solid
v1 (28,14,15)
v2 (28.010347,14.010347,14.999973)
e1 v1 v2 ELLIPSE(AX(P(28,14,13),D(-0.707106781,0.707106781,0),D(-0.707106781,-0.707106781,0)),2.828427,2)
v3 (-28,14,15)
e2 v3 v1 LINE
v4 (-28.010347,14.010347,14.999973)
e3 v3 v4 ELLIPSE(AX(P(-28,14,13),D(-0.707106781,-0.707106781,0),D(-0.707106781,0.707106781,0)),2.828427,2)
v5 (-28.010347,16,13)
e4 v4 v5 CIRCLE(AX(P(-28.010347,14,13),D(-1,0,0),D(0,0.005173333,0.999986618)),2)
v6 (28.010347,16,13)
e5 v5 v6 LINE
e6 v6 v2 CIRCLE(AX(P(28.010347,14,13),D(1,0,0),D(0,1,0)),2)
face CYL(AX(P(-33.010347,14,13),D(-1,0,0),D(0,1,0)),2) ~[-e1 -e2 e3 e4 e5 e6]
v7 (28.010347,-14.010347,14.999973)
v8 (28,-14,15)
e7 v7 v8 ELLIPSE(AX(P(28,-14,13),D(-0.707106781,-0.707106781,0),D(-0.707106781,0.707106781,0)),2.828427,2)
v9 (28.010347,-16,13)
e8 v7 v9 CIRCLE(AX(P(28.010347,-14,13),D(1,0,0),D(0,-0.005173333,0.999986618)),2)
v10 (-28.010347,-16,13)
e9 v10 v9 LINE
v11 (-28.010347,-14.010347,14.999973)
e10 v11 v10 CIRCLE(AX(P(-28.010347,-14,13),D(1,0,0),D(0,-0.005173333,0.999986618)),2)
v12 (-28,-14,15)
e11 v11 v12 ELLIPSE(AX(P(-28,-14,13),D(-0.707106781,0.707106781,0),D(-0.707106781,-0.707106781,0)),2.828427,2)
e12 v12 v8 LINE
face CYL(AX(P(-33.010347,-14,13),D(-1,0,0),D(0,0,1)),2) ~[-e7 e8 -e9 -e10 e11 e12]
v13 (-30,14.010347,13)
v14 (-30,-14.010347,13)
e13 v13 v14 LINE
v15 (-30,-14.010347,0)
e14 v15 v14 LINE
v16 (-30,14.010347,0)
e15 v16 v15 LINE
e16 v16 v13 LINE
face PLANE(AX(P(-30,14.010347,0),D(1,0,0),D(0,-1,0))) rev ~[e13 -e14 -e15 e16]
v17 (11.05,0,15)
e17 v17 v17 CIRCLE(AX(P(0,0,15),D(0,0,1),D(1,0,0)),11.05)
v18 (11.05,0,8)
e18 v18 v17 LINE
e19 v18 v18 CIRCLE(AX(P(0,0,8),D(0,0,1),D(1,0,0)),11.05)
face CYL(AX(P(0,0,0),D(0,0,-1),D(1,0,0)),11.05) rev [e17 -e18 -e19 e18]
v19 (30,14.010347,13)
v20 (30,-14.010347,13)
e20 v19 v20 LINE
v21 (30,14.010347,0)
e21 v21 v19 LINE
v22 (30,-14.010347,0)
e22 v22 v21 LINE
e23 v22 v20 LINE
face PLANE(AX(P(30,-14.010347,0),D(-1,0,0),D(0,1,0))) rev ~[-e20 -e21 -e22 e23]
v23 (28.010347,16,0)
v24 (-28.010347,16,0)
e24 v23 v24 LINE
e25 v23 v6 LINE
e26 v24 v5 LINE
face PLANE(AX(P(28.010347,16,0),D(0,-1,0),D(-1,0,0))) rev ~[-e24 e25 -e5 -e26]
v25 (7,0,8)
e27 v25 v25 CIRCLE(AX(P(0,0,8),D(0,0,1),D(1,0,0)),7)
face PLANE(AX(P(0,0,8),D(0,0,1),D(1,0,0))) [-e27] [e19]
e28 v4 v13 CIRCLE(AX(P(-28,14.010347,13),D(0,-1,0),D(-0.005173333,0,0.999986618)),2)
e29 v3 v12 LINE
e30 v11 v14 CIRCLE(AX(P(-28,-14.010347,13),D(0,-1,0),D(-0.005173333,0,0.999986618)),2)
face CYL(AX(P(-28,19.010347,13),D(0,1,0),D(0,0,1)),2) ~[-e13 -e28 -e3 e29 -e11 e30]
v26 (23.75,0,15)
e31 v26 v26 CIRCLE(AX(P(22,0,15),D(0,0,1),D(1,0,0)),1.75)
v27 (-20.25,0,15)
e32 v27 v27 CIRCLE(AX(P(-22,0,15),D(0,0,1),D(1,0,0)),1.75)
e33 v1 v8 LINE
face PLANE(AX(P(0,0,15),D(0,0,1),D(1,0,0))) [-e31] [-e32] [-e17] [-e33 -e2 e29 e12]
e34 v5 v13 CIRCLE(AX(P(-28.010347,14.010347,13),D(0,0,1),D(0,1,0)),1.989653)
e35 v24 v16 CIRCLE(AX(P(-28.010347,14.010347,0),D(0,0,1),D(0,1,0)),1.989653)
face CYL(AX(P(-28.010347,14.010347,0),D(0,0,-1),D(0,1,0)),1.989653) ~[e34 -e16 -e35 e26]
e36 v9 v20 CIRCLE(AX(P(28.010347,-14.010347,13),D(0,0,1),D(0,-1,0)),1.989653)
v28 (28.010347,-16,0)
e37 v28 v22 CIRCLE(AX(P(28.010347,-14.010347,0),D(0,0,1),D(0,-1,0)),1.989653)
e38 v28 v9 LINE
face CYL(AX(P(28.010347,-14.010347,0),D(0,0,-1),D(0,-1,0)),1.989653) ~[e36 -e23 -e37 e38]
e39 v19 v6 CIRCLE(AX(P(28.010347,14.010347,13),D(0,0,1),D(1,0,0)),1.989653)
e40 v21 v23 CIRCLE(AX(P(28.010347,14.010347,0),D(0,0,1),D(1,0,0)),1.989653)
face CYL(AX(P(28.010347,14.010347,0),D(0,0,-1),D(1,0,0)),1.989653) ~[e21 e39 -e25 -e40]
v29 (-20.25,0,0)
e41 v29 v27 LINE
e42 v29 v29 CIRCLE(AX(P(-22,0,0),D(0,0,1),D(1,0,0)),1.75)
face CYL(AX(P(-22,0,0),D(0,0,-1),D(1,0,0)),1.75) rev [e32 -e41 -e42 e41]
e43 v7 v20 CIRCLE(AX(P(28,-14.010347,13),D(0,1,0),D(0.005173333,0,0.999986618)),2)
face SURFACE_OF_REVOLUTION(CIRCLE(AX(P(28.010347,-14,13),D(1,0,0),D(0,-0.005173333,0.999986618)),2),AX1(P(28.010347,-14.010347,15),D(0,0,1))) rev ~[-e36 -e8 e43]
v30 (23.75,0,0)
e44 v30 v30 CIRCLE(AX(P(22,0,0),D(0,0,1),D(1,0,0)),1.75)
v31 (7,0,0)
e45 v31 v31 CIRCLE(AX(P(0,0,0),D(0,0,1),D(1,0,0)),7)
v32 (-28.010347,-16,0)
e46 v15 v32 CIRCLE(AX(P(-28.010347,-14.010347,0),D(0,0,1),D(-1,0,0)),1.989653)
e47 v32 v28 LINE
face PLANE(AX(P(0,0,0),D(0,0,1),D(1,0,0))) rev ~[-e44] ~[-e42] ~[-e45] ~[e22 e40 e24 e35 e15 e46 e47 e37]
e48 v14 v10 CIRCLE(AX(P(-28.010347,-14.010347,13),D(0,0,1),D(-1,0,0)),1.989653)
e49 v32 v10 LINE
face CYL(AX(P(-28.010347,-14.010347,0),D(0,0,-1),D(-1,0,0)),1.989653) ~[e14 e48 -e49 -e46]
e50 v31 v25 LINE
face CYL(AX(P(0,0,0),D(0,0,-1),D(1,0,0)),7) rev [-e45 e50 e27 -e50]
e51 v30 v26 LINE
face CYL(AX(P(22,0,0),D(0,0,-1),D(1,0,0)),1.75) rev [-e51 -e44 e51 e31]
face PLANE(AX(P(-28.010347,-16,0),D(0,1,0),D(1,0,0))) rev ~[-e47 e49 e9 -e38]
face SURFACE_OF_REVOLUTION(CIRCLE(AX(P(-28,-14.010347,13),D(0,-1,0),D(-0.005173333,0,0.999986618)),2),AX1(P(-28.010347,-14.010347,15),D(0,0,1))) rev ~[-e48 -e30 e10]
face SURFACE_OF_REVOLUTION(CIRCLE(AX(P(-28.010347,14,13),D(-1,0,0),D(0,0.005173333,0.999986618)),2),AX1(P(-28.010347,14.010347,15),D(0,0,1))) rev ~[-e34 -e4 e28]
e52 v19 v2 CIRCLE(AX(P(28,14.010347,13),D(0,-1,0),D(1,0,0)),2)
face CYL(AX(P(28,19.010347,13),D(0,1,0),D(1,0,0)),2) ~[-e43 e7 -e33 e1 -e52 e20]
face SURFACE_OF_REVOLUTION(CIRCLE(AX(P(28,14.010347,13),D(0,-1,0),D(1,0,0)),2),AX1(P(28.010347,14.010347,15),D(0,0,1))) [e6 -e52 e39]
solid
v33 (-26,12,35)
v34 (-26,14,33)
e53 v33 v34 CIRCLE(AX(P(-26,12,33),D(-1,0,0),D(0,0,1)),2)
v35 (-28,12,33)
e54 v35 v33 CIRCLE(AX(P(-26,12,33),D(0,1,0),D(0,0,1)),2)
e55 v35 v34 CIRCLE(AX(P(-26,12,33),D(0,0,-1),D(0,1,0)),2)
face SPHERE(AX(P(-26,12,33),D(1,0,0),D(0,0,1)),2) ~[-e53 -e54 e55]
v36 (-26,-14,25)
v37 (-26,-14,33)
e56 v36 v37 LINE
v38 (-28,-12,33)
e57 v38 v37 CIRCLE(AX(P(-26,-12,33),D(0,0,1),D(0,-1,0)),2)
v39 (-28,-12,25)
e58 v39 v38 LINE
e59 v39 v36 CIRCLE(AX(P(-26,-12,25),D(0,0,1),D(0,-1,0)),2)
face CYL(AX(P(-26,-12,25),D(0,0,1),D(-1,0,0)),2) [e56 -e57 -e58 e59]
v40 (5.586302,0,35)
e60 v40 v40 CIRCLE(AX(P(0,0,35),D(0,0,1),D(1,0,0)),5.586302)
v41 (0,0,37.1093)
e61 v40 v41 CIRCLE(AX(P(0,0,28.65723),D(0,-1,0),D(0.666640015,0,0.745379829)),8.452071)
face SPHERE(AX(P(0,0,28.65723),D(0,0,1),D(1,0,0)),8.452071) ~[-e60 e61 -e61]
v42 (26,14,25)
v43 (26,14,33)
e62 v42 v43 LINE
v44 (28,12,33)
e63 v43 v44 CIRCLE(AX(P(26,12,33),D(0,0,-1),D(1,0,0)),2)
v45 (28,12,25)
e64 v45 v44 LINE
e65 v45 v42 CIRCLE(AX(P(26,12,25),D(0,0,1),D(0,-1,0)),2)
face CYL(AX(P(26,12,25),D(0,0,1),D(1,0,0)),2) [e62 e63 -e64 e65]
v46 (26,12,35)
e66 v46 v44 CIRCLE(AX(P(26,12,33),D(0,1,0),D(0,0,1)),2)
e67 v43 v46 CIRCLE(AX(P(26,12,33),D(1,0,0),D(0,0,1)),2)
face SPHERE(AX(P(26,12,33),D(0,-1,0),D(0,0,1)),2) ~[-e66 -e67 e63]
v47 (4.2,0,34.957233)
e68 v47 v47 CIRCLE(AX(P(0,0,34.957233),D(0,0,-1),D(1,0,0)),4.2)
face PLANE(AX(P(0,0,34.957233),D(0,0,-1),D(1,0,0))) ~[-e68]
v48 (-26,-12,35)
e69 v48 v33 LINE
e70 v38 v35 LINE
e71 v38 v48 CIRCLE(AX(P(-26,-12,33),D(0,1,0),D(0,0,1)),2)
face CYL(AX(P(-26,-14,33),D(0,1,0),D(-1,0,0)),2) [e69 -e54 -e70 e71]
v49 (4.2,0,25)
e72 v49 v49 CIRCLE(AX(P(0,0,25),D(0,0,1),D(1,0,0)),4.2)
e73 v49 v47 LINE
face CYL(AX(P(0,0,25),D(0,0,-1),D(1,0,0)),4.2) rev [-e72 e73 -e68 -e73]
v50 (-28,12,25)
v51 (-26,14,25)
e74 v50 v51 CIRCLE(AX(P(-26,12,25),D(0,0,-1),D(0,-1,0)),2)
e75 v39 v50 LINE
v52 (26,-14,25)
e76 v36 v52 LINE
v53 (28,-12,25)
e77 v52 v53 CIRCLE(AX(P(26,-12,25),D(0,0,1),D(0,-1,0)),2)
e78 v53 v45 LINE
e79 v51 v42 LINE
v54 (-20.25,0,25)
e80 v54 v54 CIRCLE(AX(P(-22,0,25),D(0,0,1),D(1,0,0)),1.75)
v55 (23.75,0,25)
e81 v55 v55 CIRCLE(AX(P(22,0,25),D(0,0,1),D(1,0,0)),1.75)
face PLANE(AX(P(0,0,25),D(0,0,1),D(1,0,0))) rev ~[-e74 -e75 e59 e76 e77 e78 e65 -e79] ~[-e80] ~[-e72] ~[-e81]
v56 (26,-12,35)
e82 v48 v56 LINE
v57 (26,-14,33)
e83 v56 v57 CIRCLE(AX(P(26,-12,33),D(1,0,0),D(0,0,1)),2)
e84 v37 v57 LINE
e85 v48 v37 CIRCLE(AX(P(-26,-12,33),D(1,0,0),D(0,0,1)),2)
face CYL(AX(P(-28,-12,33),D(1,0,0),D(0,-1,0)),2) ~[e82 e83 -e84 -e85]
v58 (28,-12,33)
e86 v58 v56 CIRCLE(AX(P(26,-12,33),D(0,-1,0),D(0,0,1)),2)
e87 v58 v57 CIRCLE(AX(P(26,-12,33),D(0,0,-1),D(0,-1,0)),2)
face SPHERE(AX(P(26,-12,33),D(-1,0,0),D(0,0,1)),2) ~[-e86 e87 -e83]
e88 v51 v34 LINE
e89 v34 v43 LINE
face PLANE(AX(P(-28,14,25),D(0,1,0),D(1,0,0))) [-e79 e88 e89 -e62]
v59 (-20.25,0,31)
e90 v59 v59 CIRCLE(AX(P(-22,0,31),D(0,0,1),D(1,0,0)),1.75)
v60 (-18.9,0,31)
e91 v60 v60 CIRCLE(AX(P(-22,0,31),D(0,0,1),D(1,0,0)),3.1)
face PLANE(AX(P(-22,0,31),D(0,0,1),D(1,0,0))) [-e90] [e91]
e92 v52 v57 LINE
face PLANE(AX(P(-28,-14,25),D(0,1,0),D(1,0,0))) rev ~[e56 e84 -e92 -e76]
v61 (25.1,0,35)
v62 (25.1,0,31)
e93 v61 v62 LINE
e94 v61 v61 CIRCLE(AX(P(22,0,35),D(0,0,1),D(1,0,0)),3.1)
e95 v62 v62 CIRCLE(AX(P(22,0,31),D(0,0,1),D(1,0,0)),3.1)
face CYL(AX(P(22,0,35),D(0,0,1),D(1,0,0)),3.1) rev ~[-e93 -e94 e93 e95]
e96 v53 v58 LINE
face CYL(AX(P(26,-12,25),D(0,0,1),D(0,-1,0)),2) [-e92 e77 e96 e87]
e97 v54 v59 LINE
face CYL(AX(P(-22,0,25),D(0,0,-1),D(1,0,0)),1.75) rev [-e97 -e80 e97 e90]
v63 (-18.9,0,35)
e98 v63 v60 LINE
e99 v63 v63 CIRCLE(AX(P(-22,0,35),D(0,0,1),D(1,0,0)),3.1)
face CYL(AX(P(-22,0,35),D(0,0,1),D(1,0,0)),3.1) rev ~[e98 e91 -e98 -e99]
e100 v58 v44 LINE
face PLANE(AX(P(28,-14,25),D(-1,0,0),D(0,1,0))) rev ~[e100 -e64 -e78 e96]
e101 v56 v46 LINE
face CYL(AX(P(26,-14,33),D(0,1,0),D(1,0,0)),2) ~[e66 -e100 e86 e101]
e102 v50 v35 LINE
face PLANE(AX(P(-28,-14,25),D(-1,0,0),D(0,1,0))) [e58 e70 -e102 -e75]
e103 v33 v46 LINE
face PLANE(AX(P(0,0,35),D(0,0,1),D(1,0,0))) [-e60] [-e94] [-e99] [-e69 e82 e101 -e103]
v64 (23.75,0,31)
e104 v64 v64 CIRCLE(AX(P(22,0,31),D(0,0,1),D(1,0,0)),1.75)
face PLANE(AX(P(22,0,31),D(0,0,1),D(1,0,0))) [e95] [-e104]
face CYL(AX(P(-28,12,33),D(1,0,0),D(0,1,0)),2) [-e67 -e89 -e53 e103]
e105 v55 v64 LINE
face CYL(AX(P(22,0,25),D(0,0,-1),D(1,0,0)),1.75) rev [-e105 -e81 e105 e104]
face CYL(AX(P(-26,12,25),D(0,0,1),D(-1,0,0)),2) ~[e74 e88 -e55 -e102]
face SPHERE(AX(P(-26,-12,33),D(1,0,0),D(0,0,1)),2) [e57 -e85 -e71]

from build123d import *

# Parameters (mm, degrees)
F0_R         = 1.75
F0_R_2       = 11.05
F1_DEPTH     = 15
F0_R_3       = 7
F2_DEPTH     = 8
F4_W         = 56
F4_H         = 28
F4_R         = 1.75
F4_R_2       = 4.2
F5_DEPTH     = 10
F6_R         = 2
F7_DEPTH     = 10
F8_T1_DEPTH  = 66.0206933322
F8_T3_DEPTH  = 38.0206933322
F8_T6_ANGLE  = 90
F8_T8_ANGLE  = 90
F8_T10_ANGLE = 90
F8_T12_ANGLE = 90
F9_R         = 3.1
F9_R_2       = 1.75
F10_DEPTH    = 4


# Not quite as in the source:
# - a fillet or chamfer that OpenCascade refuses, or shapes differently, is made with other operations: its cross-section is extruded or revolved along the edge and cut away or added
# - a feature names something its author has since deleted; it is built from what else it names


with BuildPart() as f1:
    # F0 (on Top) → F1 (new body)
    with BuildSketch(Plane.XY):
        with BuildLine():
            Line((28.0103466661, 16), (-28.0103466661, 16))
            ThreePointArc((-28.0103466661, 16), (-29.4172440307, 15.4172440307), (-30, 14.0103466661))
            Line((-30, 14.0103466661), (-30, -14.0103466661))
            ThreePointArc((-30, -14.0103466661), (-29.4172440307, -15.4172440307), (-28.0103466661, -16))
            Line((-28.0103466661, -16), (28.0103466661, -16))
            ThreePointArc((28.0103466661, -16), (29.4172440307, -15.4172440307), (30, -14.0103466661))
            Line((30, -14.0103466661), (30, 14.0103466661))
            ThreePointArc((30, 14.0103466661), (29.4172440307, 15.4172440307), (28.0103466661, 16))
        make_face()
        with Locations((-22, 0)):
            Circle(F0_R, mode=Mode.SUBTRACT)
        Circle(F0_R_2, mode=Mode.SUBTRACT)
        with Locations((22, 0)):
            Circle(F0_R, mode=Mode.SUBTRACT)
    extrude(amount=F1_DEPTH)

    # F0 (on Top) → F2 (join)
    with BuildSketch(Plane.XY):
        Circle(F0_R_2)
        Circle(F0_R_3, mode=Mode.SUBTRACT)
    extrude(amount=F2_DEPTH)

    # F8: fillet of radius 2 on 8 edges, made by hand

    # F8_s2 → F8_t1 (cut)
    with BuildSketch(Plane.YZ.offset(-33.0103466661)):
        with BuildLine():
            ThreePointArc((-14, 15), (-15.4142135624, 14.4142135624), (-16, 13))
            Line((-16, 13), (-16, 15))
            Line((-16, 15), (-14, 15))
        make_face()
        with BuildLine():
            ThreePointArc((16, 13), (15.4142135624, 14.4142135624), (14, 15))
            Line((14, 15), (16, 15))
            Line((16, 15), (16, 13))
        make_face()
    extrude(amount=F8_T1_DEPTH, mode=Mode.SUBTRACT)

    # F8_s4 → F8_t3 (cut)
    with BuildSketch(Plane.XZ.offset(-19.0103466661)):
        with BuildLine():
            ThreePointArc((30, 13), (29.4142135624, 14.4142135624), (28, 15))
            Line((28, 15), (30, 15))
            Line((30, 15), (30, 13))
        make_face()
        with BuildLine():
            ThreePointArc((-28, 15), (-29.4142135624, 14.4142135624), (-30, 13))
            Line((-30, 13), (-30, 15))
            Line((-30, 15), (-28, 15))
        make_face()
    extrude(amount=F8_T3_DEPTH, mode=Mode.SUBTRACT)

    # F8_s5 → F8_t6 (revolve, cut)
    with BuildSketch(Plane.XZ.offset(-14.0103466661)):
        with BuildLine():
            ThreePointArc((30, 13), (29.4178669423, 14.4105507201), (28.0103466661, 14.9999732364))
            Line((28.0103466661, 14.9999732364), (28.0103466661, 15))
            Line((28.0103466661, 15), (30, 15))
            Line((30, 15), (30, 13))
        make_face()
    revolve(axis=Axis((28.0103466661, 14.0103466661, 15), (0, 0, 1)), revolution_arc=F8_T6_ANGLE, mode=Mode.SUBTRACT)

    # F8_s7 → F8_t8 (revolve, cut)
    with BuildSketch(Plane.YZ.offset(-28.0103466661)):
        with BuildLine():
            ThreePointArc((14.0103466661, 14.9999732364), (15.4178669423, 14.4105507201), (16, 13))
            Line((16, 13), (16, 15))
            Line((16, 15), (14.0103466661, 15))
            Line((14.0103466661, 15), (14.0103466661, 14.9999732364))
        make_face()
    revolve(axis=Axis((-28.0103466661, 14.0103466661, 15), (0, 0, 1)), revolution_arc=F8_T8_ANGLE, mode=Mode.SUBTRACT)

    # F8_s9 → F8_t10 (revolve, cut)
    with BuildSketch(Plane.XZ.offset(14.0103466661)):
        with BuildLine():
            ThreePointArc((-28.0103466661, 14.9999732364), (-29.4178669423, 14.4105507201), (-30, 13))
            Line((-30, 13), (-30, 15))
            Line((-30, 15), (-28.0103466661, 15))
            Line((-28.0103466661, 15), (-28.0103466661, 14.9999732364))
        make_face()
    revolve(axis=Axis((-28.0103466661, -14.0103466661, 15), (0, 0, 1)), revolution_arc=F8_T10_ANGLE, mode=Mode.SUBTRACT)

    # F8_s11 → F8_t12 (revolve, cut)
    with BuildSketch(Plane.YZ.offset(28.0103466661)):
        with BuildLine():
            ThreePointArc((-14.0103466661, 14.9999732364), (-15.4178669423, 14.4105507201), (-16, 13))
            Line((-16, 13), (-16, 15))
            Line((-16, 15), (-14.0103466661, 15))
            Line((-14.0103466661, 15), (-14.0103466661, 14.9999732364))
        make_face()
    revolve(axis=Axis((28.0103466661, -14.0103466661, 15), (0, 0, 1)), revolution_arc=F8_T12_ANGLE, mode=Mode.SUBTRACT)


with BuildPart() as f5:
    # F4 (on offset) → F5 (new body)
    with BuildSketch(Plane.XY.offset(25)):
        Rectangle(F4_W, F4_H)
        with Locations((-22, 0)):
            Circle(F4_R, mode=Mode.SUBTRACT)
        Circle(F4_R_2, mode=Mode.SUBTRACT)
        with Locations((22, 0)):
            Circle(F4_R, mode=Mode.SUBTRACT)
        Circle(F4_R_2)
    extrude(amount=F5_DEPTH)

    # F6
    f6_edges = [f5.edges().sort_by_distance(p)[0] for p in [
        (0, -14, 35),
        (28, 0, 35),
        (0, 14, 35),
        (-28, 0, 35),
        (-28, -14, 30),
        (-28, 14, 30),
        (28, -14, 30),
        (28, 14, 30),
    ]]
    fillet(f6_edges, radius=F6_R)

    # F4 (on offset) → F7 (cut)
    with BuildSketch(Plane.XY.offset(25)):
        Circle(F4_R_2)
    extrude(amount=F7_DEPTH, mode=Mode.SUBTRACT)

    # F9 (on face) → F10 (cut)
    with BuildSketch(Plane.XY.offset(35)):
        with Locations((-22, 0)):
            Circle(F9_R)
        with Locations((-22, 0)):
            Circle(F9_R_2, mode=Mode.SUBTRACT)
        with Locations((22, 0)):
            Circle(F9_R)
        with Locations((22, 0)):
            Circle(F9_R_2, mode=Mode.SUBTRACT)
    extrude(amount=-F10_DEPTH, mode=Mode.SUBTRACT)

    # F11 (on Front) → F12 (revolve)
    with BuildSketch(Plane.XZ):
        with BuildLine():
            Line((0, 34.9572327588), (5.6344886552, 34.9572327588))
            ThreePointArc((5.6344886552, 34.9572327588), (3.0157444319, 36.5529745163), (0, 37.1093004872))
            Line((0, 37.1093004872), (0, 34.9572327588))
        make_face()
    revolve(axis=Axis((0, 0, 36.033266623), (0, 0, -1)))


solid = Compound([f1.part, f5.part])
